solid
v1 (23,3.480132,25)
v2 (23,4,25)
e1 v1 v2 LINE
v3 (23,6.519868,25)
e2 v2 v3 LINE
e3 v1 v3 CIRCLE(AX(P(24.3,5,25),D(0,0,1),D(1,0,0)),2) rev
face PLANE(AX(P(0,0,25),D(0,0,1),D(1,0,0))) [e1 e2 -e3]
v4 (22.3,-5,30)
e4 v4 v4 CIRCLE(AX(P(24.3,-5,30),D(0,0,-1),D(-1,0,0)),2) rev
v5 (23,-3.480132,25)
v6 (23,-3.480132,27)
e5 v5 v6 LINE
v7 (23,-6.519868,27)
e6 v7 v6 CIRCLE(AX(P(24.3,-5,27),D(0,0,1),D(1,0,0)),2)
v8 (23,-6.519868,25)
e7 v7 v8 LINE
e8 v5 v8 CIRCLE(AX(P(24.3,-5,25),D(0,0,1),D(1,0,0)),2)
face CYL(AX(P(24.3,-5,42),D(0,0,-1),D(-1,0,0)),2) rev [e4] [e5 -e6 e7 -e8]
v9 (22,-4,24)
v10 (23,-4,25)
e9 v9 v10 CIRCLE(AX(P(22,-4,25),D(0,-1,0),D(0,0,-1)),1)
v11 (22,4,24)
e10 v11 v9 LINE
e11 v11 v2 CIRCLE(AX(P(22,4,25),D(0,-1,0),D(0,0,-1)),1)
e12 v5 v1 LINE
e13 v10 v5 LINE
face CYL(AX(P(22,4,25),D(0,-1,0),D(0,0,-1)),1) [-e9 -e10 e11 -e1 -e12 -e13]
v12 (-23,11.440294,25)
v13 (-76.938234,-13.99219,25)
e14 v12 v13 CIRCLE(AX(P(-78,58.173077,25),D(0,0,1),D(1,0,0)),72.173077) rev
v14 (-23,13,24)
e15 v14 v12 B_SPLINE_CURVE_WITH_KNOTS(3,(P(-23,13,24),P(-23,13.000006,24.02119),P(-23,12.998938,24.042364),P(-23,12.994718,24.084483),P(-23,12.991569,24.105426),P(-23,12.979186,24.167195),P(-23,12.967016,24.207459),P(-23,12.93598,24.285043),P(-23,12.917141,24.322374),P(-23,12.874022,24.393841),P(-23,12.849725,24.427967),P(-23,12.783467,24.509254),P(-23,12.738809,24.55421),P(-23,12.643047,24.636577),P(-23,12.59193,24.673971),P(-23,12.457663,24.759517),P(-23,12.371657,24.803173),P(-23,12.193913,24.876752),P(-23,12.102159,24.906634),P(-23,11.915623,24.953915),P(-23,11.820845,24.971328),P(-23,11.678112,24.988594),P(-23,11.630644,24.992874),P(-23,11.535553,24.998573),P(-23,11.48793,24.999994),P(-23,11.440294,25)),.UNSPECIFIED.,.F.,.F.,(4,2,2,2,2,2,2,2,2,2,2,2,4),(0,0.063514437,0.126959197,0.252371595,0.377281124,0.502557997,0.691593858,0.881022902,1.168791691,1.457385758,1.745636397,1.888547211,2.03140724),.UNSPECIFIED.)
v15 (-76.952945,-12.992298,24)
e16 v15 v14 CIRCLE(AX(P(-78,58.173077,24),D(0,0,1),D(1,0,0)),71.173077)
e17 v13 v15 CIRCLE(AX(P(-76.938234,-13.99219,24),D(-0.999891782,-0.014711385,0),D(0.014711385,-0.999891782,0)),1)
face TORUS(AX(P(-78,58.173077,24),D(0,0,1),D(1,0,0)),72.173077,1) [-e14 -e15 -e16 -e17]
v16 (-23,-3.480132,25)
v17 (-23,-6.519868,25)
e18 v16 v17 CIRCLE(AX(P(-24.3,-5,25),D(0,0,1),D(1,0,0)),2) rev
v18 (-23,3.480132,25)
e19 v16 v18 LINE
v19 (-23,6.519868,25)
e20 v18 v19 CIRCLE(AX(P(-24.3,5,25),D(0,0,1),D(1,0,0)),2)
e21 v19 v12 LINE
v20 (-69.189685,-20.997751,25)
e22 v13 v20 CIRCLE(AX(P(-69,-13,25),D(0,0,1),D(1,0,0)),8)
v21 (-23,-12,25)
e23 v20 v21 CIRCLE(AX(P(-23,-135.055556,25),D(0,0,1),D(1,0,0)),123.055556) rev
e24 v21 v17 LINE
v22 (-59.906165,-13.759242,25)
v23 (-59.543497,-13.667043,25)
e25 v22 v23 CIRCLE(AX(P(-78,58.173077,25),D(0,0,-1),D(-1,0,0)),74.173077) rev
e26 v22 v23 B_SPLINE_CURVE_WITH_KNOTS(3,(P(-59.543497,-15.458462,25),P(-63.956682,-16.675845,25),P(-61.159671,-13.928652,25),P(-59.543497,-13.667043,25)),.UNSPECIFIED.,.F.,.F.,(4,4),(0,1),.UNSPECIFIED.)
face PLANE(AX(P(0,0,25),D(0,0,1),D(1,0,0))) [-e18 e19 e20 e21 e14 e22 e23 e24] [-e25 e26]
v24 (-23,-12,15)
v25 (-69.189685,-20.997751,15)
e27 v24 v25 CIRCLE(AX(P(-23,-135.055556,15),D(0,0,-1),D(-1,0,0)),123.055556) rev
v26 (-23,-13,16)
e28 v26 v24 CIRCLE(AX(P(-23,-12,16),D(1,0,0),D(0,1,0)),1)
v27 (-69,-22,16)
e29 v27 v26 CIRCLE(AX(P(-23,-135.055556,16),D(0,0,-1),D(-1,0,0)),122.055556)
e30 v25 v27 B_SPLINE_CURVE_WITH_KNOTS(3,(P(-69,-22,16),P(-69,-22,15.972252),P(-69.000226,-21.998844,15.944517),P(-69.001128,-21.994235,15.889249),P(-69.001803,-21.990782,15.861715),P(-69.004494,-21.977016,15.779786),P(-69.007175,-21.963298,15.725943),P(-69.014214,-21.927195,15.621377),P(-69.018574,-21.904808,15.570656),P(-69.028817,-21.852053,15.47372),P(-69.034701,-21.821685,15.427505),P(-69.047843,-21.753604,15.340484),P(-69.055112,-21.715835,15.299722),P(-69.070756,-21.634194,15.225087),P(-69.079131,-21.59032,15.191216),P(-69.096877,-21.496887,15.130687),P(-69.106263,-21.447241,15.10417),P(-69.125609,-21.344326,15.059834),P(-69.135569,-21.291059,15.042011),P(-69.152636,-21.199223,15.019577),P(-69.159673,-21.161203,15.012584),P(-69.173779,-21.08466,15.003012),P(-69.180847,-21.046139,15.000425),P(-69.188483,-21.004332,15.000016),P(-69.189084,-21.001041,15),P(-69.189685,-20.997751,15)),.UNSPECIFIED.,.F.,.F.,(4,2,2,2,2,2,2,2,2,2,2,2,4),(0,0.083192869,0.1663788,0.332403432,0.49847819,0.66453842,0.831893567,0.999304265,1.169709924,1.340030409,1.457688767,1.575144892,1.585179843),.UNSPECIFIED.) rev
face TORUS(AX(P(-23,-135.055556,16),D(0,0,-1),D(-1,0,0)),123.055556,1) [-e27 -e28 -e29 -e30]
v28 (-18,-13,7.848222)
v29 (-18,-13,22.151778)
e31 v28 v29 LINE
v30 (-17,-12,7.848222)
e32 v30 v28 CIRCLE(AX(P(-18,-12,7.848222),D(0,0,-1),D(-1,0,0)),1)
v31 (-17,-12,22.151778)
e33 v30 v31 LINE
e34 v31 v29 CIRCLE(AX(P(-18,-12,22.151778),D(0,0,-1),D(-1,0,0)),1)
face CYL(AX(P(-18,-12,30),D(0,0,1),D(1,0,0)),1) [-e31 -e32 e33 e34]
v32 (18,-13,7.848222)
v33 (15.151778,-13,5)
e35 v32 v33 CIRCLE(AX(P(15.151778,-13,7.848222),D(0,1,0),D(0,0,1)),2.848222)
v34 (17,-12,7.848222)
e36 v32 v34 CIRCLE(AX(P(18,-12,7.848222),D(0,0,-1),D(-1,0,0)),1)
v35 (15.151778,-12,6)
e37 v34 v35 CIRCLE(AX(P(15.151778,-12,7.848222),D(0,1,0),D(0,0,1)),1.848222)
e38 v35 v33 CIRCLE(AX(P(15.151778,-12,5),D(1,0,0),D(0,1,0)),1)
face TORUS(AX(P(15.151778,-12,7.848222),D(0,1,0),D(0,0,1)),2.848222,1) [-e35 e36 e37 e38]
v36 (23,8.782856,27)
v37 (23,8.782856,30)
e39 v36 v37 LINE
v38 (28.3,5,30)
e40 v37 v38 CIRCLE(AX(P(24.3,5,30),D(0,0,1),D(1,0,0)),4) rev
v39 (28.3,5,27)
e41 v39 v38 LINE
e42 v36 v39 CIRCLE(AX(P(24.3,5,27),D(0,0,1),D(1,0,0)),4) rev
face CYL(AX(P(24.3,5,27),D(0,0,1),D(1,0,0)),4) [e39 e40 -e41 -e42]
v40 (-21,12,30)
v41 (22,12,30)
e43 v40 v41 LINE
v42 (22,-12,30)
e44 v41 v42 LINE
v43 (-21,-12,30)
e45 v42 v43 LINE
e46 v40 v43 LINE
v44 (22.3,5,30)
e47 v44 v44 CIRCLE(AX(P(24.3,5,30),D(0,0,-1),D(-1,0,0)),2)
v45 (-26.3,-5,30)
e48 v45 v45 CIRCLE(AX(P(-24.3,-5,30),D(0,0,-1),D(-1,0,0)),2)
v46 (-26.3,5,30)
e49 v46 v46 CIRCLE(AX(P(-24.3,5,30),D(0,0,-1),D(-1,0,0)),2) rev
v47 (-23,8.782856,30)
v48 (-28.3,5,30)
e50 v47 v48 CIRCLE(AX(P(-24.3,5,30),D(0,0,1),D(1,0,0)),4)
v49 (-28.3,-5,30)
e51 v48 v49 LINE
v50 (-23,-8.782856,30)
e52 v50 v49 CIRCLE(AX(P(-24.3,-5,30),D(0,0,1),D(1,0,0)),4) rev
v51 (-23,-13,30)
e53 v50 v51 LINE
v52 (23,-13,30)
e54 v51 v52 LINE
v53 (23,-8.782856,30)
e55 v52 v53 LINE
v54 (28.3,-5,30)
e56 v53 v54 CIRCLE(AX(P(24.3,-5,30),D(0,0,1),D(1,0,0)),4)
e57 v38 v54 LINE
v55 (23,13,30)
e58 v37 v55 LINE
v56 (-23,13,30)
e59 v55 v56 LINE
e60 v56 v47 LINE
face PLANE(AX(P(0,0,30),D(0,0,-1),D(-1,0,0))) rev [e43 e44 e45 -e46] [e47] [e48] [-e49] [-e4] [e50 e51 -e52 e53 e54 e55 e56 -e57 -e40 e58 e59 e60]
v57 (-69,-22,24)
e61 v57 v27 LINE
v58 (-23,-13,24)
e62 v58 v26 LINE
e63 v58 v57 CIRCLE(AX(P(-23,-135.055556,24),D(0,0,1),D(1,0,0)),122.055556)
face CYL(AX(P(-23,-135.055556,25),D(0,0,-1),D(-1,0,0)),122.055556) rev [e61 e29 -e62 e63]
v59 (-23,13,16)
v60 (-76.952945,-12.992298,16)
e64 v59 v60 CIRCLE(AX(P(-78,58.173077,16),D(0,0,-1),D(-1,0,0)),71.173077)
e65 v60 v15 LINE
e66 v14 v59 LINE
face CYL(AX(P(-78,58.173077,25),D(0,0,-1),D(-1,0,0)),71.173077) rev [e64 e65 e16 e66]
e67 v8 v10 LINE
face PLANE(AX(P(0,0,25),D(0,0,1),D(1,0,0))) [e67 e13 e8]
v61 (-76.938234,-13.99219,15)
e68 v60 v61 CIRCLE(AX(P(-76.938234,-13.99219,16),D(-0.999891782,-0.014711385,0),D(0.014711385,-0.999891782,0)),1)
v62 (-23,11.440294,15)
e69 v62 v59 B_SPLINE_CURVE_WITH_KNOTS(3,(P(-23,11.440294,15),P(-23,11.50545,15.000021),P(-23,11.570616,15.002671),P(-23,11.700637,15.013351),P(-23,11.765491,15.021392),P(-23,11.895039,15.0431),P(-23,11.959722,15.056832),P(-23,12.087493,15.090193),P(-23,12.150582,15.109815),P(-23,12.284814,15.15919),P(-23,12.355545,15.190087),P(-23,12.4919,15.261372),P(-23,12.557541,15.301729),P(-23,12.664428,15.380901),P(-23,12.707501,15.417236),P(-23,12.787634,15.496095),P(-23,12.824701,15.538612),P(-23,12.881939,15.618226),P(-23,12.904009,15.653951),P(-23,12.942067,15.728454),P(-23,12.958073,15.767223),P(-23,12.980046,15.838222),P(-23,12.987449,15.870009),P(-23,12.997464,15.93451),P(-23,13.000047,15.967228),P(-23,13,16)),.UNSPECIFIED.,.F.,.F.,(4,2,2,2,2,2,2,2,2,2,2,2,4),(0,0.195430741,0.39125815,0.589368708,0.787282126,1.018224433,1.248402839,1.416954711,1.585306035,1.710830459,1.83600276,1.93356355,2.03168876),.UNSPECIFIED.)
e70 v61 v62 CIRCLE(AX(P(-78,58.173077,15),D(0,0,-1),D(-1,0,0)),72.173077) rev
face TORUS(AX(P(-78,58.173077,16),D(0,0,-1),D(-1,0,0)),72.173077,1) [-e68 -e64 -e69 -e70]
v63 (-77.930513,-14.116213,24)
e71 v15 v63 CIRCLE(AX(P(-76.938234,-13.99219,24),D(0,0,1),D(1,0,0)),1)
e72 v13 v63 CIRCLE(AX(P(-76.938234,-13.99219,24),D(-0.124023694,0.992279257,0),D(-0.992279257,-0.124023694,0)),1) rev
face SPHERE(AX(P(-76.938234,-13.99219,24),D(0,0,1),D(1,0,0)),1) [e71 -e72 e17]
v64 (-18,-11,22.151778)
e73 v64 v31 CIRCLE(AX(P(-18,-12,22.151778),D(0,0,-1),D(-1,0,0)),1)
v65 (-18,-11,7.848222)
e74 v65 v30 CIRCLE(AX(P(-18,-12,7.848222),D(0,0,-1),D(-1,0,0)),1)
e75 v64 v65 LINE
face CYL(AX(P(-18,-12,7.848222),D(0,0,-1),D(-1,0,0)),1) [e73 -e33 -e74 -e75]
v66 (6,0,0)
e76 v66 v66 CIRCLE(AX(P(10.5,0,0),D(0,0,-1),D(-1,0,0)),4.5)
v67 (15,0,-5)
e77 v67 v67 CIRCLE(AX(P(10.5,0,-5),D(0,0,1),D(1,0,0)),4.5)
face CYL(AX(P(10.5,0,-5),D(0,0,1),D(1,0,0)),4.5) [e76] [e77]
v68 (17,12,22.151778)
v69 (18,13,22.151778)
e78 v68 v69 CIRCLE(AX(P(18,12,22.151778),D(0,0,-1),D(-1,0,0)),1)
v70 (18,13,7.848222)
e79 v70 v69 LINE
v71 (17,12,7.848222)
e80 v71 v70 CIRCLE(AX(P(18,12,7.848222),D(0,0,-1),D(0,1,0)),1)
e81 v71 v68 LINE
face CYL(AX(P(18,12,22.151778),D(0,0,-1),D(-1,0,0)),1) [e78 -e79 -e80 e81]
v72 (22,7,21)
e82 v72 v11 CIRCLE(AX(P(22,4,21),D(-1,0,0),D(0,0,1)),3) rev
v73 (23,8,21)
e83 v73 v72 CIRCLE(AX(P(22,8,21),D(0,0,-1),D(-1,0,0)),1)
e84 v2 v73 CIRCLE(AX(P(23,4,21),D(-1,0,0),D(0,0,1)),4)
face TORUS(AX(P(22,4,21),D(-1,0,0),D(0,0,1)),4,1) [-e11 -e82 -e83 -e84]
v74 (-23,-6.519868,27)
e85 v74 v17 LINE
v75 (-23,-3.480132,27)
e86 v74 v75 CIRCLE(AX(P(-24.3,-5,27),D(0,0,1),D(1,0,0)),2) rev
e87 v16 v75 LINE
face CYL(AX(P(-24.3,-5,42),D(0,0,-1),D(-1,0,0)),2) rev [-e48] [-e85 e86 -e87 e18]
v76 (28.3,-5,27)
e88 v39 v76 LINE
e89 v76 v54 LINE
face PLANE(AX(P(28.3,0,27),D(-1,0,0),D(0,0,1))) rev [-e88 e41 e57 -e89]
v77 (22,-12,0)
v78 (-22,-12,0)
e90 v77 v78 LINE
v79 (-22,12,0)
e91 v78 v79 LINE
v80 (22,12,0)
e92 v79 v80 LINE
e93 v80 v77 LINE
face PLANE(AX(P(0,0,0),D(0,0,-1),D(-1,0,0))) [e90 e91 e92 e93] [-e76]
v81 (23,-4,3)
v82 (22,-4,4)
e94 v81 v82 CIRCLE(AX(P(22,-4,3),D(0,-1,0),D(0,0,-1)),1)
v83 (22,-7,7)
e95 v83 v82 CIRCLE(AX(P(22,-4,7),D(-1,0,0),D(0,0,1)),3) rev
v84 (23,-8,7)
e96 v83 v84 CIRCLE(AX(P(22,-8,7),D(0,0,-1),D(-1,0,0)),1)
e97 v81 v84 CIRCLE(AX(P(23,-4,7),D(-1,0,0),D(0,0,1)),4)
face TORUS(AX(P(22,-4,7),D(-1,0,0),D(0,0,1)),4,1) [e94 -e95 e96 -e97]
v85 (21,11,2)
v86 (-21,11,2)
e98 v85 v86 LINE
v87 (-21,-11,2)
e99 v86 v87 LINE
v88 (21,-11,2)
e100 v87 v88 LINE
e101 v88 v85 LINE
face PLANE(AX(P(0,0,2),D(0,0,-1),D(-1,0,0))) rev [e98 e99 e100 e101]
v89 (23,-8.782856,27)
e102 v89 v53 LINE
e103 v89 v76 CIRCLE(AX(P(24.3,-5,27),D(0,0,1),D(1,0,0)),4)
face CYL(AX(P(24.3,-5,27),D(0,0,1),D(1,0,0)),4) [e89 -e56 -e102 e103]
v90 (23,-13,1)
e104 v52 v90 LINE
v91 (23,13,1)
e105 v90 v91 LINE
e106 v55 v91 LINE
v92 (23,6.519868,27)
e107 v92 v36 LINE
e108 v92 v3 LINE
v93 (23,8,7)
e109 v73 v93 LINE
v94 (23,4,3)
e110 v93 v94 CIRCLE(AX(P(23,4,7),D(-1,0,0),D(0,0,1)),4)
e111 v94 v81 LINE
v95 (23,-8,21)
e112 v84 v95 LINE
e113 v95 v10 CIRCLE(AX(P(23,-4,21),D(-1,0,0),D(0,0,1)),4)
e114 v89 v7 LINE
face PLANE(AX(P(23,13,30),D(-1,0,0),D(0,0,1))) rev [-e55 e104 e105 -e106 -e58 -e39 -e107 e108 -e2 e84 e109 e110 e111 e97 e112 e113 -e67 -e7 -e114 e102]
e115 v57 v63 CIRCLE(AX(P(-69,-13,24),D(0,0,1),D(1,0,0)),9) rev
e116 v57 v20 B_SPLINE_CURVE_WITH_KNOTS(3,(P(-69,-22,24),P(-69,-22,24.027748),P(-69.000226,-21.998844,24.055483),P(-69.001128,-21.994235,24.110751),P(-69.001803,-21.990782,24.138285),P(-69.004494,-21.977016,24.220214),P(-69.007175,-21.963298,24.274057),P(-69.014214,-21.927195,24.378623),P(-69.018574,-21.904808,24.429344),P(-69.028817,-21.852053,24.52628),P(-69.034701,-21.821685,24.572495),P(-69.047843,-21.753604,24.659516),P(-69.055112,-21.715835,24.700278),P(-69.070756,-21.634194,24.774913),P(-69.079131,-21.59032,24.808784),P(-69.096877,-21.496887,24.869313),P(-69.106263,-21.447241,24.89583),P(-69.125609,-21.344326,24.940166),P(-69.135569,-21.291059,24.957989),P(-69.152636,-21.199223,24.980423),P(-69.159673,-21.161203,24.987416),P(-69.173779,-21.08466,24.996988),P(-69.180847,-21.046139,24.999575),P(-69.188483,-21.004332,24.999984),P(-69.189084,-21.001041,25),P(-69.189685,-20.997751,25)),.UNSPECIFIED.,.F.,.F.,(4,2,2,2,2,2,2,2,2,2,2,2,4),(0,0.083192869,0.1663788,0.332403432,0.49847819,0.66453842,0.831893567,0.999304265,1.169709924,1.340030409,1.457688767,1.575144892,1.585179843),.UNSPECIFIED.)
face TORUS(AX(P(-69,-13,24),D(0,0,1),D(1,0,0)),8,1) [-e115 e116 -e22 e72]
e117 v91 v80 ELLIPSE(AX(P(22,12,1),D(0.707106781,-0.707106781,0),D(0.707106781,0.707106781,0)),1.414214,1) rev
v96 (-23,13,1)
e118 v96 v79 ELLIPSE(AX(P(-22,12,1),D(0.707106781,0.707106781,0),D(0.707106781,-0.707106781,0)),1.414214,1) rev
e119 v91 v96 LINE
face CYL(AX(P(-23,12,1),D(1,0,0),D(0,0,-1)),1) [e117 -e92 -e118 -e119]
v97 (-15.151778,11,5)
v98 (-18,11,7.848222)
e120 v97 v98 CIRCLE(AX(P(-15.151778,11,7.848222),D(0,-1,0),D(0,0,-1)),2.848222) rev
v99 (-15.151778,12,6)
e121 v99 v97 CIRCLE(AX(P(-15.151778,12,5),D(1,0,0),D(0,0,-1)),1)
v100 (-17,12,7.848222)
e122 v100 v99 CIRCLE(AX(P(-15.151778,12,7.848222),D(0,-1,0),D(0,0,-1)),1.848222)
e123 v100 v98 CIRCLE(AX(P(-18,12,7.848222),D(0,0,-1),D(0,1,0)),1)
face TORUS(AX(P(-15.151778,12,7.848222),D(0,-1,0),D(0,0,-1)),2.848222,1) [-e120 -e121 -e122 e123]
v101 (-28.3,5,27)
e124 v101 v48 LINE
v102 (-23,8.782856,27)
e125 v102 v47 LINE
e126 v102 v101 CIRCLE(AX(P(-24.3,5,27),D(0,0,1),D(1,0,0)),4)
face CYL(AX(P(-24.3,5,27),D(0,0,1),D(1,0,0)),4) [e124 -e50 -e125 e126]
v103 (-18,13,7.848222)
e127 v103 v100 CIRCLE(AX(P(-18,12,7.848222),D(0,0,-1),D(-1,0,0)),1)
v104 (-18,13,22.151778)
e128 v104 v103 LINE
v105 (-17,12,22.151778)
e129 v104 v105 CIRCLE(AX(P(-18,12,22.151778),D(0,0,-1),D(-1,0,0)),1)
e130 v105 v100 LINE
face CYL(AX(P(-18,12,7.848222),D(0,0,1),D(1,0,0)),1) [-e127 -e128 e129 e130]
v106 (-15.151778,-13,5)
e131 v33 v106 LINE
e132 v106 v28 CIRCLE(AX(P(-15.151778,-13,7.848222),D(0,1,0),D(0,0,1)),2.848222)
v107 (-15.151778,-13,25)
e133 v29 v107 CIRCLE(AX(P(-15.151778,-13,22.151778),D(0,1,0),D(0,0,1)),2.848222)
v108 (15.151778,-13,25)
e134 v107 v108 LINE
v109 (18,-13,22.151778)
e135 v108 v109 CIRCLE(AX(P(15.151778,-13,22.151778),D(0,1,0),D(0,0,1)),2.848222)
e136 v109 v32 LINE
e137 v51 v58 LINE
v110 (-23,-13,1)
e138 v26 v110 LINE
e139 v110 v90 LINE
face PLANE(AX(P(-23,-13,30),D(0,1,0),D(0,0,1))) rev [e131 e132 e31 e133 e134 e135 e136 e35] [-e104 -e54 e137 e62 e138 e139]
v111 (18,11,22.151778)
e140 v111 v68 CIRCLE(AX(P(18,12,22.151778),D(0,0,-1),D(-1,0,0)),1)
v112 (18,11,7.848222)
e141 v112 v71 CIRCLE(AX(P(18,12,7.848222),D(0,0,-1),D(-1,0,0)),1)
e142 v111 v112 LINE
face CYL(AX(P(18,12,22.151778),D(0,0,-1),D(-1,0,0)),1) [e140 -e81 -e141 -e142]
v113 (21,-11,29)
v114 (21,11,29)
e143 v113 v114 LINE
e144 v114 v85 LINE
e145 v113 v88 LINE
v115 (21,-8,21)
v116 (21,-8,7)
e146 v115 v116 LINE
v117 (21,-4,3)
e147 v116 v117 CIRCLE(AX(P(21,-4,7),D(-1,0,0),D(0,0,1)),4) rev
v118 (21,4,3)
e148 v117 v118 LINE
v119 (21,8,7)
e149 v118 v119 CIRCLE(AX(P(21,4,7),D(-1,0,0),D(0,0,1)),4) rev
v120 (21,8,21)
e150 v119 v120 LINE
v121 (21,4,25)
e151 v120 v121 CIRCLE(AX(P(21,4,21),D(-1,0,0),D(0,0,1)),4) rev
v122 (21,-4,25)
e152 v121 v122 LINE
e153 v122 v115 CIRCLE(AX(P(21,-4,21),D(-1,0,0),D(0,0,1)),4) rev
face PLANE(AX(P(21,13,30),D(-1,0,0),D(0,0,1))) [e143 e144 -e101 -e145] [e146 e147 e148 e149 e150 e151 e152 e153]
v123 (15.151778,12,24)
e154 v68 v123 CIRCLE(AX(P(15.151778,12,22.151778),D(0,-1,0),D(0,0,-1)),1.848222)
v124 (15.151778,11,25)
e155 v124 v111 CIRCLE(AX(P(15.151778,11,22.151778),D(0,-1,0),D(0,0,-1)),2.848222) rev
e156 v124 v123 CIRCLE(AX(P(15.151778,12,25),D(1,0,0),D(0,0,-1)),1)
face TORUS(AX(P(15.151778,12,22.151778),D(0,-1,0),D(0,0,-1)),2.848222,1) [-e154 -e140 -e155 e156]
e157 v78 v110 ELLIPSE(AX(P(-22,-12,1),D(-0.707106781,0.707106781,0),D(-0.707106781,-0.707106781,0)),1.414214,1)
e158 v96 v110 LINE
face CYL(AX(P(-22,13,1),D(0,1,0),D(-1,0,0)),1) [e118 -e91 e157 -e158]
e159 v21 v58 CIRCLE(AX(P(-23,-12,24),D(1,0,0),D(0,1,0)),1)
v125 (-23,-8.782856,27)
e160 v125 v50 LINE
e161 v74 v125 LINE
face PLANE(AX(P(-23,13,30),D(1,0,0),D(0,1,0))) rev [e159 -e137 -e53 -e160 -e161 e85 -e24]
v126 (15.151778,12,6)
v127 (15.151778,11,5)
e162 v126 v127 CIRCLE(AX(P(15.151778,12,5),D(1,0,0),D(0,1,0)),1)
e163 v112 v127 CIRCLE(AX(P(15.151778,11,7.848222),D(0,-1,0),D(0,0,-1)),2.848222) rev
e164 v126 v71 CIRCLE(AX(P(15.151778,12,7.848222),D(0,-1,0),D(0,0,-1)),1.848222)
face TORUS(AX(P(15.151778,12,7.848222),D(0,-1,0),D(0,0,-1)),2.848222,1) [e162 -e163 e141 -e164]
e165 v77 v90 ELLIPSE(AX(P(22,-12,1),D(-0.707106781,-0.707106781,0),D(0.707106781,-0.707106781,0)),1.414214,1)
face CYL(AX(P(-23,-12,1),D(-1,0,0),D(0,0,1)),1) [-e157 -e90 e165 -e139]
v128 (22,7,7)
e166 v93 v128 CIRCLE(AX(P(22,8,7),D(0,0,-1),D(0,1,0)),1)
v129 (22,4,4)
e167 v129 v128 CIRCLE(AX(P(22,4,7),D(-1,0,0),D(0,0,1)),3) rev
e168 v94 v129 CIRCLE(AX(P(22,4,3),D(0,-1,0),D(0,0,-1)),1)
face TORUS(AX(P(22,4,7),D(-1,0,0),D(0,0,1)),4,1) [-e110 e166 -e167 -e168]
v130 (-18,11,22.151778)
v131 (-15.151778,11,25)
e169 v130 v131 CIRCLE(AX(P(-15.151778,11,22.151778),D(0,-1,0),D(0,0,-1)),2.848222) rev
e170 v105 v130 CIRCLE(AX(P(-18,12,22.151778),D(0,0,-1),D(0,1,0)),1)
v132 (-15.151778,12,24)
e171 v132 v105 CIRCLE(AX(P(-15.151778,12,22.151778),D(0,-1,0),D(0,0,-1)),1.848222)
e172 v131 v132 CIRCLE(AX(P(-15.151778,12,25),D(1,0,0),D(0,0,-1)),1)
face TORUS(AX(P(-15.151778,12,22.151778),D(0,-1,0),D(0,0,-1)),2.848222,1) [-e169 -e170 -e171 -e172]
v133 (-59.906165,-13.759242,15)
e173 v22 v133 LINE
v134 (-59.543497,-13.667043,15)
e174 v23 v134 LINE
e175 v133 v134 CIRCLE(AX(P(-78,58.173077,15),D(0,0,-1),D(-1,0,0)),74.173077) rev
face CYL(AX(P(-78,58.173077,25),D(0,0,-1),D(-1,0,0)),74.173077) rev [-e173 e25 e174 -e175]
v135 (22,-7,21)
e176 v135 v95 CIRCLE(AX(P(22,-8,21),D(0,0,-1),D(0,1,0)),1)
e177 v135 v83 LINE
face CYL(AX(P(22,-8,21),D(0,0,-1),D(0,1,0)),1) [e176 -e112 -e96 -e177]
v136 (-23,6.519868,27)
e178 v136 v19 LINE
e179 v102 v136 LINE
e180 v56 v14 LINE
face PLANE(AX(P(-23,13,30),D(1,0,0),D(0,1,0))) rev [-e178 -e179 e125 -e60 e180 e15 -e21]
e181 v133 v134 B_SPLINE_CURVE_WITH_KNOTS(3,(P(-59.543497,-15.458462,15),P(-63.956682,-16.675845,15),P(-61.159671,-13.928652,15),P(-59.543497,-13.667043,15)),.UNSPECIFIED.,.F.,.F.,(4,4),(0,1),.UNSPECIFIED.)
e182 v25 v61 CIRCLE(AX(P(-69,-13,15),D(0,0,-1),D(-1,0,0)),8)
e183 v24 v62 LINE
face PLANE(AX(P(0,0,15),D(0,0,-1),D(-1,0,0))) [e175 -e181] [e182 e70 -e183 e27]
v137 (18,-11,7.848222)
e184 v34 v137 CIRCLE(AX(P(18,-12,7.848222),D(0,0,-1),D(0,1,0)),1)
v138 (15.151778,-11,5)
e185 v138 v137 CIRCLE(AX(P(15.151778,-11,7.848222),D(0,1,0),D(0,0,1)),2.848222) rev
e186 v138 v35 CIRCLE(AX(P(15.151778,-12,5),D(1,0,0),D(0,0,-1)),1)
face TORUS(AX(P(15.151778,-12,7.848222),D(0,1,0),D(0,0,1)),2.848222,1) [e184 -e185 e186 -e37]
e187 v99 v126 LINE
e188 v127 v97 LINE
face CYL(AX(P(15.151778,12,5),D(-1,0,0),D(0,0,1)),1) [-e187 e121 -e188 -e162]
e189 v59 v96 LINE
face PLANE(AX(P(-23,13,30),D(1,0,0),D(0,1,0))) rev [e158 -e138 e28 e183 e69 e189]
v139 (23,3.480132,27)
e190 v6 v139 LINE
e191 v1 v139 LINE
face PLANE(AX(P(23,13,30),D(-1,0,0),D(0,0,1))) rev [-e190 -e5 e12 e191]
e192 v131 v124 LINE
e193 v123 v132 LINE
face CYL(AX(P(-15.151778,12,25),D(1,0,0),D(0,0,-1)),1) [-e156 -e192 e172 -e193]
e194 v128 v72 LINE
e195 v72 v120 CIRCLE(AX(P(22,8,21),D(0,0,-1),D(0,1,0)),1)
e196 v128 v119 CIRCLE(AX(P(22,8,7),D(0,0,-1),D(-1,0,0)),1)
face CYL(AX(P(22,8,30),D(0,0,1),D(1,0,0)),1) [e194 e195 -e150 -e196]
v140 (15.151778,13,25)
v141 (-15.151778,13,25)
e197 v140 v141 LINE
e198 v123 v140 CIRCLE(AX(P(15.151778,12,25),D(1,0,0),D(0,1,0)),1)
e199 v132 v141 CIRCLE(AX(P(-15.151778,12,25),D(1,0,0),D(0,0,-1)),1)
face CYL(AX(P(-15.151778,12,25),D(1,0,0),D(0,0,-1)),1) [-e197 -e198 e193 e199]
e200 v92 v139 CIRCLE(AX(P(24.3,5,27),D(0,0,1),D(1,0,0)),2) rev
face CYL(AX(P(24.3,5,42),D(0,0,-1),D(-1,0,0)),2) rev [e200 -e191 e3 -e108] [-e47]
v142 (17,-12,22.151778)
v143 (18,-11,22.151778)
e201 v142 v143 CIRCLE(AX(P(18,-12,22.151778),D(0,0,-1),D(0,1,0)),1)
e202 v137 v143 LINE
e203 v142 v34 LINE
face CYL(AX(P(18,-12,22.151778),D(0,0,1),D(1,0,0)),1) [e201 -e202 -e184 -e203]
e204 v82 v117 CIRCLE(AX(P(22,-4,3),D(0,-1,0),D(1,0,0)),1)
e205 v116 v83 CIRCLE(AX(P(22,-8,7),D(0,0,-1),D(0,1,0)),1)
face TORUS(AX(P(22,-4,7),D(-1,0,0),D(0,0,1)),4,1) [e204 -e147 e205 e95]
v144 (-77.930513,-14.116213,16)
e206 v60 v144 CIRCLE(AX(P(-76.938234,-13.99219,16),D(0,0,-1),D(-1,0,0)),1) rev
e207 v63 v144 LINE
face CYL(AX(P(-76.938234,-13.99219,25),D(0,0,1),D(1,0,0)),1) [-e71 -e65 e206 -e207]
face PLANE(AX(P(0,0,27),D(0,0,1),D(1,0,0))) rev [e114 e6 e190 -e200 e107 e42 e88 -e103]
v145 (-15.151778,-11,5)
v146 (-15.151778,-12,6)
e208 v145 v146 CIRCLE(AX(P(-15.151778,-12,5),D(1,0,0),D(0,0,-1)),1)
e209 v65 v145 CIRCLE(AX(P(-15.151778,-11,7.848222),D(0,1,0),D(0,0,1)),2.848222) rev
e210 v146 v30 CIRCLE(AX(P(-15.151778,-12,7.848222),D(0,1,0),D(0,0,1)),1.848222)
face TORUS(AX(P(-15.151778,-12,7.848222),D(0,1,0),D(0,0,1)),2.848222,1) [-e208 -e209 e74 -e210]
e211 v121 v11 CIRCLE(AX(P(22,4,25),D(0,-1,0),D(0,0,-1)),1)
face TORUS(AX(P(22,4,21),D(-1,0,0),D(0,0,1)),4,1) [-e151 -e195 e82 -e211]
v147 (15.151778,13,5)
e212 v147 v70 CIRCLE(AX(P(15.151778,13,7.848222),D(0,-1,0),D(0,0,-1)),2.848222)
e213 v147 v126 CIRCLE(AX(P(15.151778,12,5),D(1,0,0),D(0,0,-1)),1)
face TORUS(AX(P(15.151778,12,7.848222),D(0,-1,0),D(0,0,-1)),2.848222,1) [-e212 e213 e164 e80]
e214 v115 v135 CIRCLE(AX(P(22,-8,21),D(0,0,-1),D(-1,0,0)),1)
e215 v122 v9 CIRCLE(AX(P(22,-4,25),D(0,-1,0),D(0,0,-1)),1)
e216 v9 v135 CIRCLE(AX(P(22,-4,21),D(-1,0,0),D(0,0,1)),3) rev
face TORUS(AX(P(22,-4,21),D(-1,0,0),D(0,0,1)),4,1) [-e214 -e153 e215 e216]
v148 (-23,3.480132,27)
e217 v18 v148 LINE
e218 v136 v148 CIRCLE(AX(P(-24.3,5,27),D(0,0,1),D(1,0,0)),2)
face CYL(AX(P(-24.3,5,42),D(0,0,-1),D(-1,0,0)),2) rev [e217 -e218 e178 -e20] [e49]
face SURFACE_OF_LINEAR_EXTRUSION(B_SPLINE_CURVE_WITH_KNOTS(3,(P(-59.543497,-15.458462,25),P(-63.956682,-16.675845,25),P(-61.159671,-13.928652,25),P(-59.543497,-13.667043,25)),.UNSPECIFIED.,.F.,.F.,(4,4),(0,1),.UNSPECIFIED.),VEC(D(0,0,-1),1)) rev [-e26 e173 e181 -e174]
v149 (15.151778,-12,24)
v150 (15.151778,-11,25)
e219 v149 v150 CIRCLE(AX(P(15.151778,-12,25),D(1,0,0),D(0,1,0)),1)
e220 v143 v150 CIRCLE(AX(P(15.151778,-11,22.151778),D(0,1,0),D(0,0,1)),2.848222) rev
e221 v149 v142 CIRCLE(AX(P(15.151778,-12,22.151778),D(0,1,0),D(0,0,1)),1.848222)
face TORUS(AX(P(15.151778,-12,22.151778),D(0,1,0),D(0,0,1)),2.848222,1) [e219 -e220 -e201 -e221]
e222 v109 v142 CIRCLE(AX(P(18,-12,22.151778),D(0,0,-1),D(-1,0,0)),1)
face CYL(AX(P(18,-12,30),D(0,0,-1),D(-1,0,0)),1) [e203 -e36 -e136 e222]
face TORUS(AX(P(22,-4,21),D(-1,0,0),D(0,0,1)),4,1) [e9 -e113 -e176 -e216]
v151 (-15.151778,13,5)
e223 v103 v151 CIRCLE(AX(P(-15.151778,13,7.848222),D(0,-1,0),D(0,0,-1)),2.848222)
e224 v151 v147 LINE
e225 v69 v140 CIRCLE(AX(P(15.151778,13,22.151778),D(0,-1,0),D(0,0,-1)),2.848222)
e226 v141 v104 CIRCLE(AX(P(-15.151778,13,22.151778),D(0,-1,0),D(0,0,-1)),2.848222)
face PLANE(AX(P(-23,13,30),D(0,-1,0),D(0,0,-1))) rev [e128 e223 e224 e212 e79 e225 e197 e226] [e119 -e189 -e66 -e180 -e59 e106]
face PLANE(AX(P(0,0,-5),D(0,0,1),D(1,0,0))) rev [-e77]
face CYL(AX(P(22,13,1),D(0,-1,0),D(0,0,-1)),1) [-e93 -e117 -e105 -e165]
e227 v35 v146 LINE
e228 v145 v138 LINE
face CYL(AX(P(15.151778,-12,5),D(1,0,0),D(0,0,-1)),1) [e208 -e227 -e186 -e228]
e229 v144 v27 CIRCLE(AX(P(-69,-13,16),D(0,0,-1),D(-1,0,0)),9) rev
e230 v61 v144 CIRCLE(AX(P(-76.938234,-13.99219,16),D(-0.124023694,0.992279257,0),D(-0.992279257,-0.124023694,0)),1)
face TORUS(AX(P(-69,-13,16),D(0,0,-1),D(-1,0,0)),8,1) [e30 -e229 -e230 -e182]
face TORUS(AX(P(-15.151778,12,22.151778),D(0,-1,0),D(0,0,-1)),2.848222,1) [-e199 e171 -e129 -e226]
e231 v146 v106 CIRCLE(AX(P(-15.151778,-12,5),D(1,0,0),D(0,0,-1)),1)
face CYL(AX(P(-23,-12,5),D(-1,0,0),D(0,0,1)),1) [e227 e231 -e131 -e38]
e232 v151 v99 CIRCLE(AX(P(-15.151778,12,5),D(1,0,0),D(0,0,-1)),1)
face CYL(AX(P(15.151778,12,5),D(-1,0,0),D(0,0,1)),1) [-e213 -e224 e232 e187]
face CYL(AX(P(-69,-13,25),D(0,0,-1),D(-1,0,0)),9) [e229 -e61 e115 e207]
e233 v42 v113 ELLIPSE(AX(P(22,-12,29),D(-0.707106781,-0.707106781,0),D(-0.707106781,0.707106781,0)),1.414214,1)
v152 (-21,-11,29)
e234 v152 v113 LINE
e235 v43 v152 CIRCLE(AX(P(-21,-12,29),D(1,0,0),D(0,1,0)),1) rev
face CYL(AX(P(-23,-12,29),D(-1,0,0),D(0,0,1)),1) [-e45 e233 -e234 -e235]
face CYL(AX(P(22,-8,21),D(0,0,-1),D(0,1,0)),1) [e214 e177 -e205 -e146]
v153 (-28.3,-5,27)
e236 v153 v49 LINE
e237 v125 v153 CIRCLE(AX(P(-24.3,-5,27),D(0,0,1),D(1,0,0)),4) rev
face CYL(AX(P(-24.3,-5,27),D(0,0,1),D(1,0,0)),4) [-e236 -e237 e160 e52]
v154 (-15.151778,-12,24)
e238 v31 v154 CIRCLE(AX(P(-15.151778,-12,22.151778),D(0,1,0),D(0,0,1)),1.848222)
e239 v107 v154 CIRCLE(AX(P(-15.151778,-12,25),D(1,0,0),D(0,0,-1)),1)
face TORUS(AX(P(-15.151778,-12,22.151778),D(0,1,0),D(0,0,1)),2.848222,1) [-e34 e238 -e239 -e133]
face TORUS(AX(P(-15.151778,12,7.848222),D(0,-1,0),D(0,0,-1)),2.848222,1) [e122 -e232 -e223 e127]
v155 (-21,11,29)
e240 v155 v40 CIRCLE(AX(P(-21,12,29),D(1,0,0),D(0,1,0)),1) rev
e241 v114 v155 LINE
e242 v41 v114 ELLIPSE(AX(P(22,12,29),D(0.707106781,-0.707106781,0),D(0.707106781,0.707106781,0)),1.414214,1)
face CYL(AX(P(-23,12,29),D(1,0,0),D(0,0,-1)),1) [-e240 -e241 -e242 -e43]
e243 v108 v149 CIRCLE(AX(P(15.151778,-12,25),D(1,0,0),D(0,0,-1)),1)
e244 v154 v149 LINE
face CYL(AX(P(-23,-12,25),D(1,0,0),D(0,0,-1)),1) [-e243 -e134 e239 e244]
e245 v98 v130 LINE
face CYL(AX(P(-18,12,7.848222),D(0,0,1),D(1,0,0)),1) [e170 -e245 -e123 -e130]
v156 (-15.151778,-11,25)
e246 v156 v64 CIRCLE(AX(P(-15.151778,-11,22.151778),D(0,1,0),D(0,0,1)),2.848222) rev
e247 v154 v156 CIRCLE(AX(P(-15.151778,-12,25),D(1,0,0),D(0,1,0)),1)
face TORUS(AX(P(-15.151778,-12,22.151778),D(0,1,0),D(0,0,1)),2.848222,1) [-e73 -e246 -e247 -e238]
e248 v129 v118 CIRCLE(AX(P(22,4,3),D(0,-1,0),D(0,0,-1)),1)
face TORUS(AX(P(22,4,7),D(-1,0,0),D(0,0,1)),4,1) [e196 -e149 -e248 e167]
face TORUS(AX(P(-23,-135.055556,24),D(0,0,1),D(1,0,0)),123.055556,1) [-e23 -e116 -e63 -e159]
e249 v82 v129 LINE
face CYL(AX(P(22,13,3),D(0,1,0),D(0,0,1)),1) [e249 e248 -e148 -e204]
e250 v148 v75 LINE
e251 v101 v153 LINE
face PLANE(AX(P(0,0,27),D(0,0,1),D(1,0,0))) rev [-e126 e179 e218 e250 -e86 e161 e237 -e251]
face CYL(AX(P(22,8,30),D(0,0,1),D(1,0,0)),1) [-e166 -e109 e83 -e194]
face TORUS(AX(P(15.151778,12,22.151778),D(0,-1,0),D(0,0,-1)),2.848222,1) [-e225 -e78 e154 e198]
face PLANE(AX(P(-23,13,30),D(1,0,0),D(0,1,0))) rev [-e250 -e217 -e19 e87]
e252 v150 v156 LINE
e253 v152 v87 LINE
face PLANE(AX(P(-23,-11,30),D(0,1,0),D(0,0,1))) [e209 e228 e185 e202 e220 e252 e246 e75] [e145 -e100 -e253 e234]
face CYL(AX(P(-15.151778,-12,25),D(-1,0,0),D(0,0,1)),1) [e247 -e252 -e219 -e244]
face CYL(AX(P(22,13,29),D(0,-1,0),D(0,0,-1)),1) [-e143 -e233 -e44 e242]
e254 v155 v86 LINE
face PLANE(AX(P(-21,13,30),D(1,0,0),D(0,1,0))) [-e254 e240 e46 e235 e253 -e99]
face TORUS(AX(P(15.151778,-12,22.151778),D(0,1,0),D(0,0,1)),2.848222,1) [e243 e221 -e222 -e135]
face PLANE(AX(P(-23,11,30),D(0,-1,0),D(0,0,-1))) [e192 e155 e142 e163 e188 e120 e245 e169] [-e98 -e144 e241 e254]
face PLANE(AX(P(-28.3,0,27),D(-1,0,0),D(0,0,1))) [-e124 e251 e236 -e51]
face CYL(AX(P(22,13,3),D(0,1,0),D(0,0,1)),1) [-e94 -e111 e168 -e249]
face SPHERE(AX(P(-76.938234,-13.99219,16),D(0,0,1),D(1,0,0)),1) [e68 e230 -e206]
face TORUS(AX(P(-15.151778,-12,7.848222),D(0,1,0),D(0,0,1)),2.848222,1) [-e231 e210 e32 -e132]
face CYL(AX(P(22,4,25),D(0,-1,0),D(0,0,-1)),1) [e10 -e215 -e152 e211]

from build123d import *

# Parameters (mm, degrees)
SKETCH1_W               = 46
SKETCH1_H               = 26
BOSS_EXTRUDE3_DEPTH     = 30
SHELL1_T                = -2
CUT_EXTRUDE2_START      = 25
SKETCH4_R               = 2
CUT_EXTRUDE2_DEPTH      = 17
BOSS_EXTRUDE4_START     = -3
BOSS_EXTRUDE4_DEPTH     = 3
BOSS_EXTRUDE16_DEPTH    = 5
BOSS_EXTRUDE18_START    = -15
BOSS_EXTRUDE18_DEPTH    = 10
CUT_EXTRUDE5_DEPTH      = 91.603532065
CUT_EXTRUDE5_DEPTH_BACK = 91.603532065
FILLET50_R              = 1
CUT_EXTRUDE6_DEPTH      = 10
FILLET51_R              = 1


with BuildPart() as part:
    # Sketch1 → Boss-Extrude3 (new body)
    with BuildSketch(Plane.XY):
        Rectangle(SKETCH1_W, SKETCH1_H)
    extrude(amount=BOSS_EXTRUDE3_DEPTH)

    # Shell1
    shell1_openings = [part.faces().sort_by_distance(p)[0] for p in [
        (0, 0, 30),
    ]]
    offset(amount=SHELL1_T, openings=shell1_openings, kind=Kind.INTERSECTION)

    # Sketch4 → Cut-Extrude2 (cut)
    with BuildSketch(Plane.XY.offset(CUT_EXTRUDE2_START)):
        with Locations((24.3, 5)):
            Circle(SKETCH4_R)
        with Locations((24.3, -5)):
            Circle(SKETCH4_R)
        with Locations((-24.3, 5)):
            Circle(SKETCH4_R)
        with Locations((-24.3, -5)):
            Circle(SKETCH4_R)
    extrude(amount=CUT_EXTRUDE2_DEPTH, mode=Mode.SUBTRACT)

    # Sketch2 → Boss-Extrude4 (add)
    with BuildSketch(Plane.XY.offset(30).offset(BOSS_EXTRUDE4_START)):
        with BuildLine():
            ThreePointArc((-23, 8.782856064), (-26.623790008, 8.255764119), (-28.3, 5))
            Line((-28.3, 5), (-28.3, -5))
            ThreePointArc((-28.3, -5), (-26.623790008, -8.255764119), (-23, -8.782856064))
            Line((-23, -8.782856064), (-23, -6.519868415))
            ThreePointArc((-23, -6.519868415), (-26.3, -5), (-23, -3.480131585))
            Line((-23, -3.480131585), (-23, 3.480131585))
            ThreePointArc((-23, 3.480131585), (-26.3, 5), (-23, 6.519868415))
            Line((-23, 6.519868415), (-23, 8.782856064))
        make_face()
        with BuildLine():
            ThreePointArc((28.3, 5), (26.623790008, 8.255764119), (23, 8.782856064))
            Line((23, 8.782856064), (23, 6.519868415))
            ThreePointArc((23, 6.519868415), (26.3, 5), (23, 3.480131585))
            Line((23, 3.480131585), (23, -3.480131585))
            ThreePointArc((23, -3.480131585), (26.3, -5), (23, -6.519868415))
            Line((23, -6.519868415), (23, -8.782856064))
            ThreePointArc((23, -8.782856064), (26.623790008, -8.255764119), (28.3, -5))
            Line((28.3, -5), (28.3, 5))
        make_face()
    extrude(amount=BOSS_EXTRUDE4_DEPTH)

    # Sketch9 → Boss-Extrude16 (add)
    with BuildSketch(Plane.XY):
        with BuildLine():
            ThreePointArc((15, 0), (13.681980515, 3.181980515), (10.5, 4.5))
            Line((10.5, 4.5), (10.5, -4.5))
            ThreePointArc((10.5, -4.5), (13.681980515, -3.181980515), (15, 0))
        make_face()
        with BuildLine():
            Line((10.5, -4.5), (10.5, 4.5))
            ThreePointArc((10.5, 4.5), (6, 0), (10.5, -4.5))
        make_face()
    extrude(amount=-BOSS_EXTRUDE16_DEPTH)

    # Sketch14 → Boss-Extrude18 (add)
    with BuildSketch(Plane(origin=(0, 0, 0), x_dir=(-1, 0, 0), z_dir=(0, 0, -1)).offset(BOSS_EXTRUDE18_START)):
        with BuildLine():
            Line((23, 13), (23, -13))
            ThreePointArc((23, -13), (46.436083291, -15.271129848), (69, -22))
            ThreePointArc((69, -22), (75.363961031, -19.363961031), (78, -13))
            ThreePointArc((78, -13), (47.582077651, -6.172528045), (23, 13))
        make_face()
        with BuildLine():
            add(Edge.make_bspline(
                [(59.906165351, -13.759241877), (59.781268702, -13.717320791), (59.659348974, -13.685795892), (59.543496906, -13.667043022)],
                knots=[0.928317086, 0.928317086, 0.928317086, 0.928317086, 1, 1, 1, 1], degree=3))
            ThreePointArc((59.906165351, -13.759241877), (59.724772985, -13.713371159), (59.543496906, -13.667043022))
        make_face(mode=Mode.SUBTRACT)
    extrude(amount=-BOSS_EXTRUDE18_DEPTH)

    # Sketch6 → Cut-Extrude5 (cut, two sides: drawn at the far end of the back side and taken through both)
    with BuildSketch(Plane(origin=(0, 13, 0), x_dir=(1, 0, 0), z_dir=(0, 1, 0)).offset(-CUT_EXTRUDE5_DEPTH_BACK)):
        with BuildLine():
            Line((15.151778421, -6), (-15.151778421, -6))
            ThreePointArc((-15.151778421, -6), (-16.458668433, -6.541331567), (-17, -7.848221579))
            Line((-17, -7.848221579), (-17, -22.151778421))
            ThreePointArc((-17, -22.151778421), (-16.458668433, -23.458668433), (-15.151778421, -24))
            Line((-15.151778421, -24), (15.151778421, -24))
            ThreePointArc((15.151778421, -24), (16.458668433, -23.458668433), (17, -22.151778421))
            Line((17, -22.151778421), (17, -7.848221579))
            ThreePointArc((17, -7.848221579), (16.458668433, -6.541331567), (15.151778421, -6))
        make_face()
    extrude(amount=CUT_EXTRUDE5_DEPTH + CUT_EXTRUDE5_DEPTH_BACK, mode=Mode.SUBTRACT)

    # Fillet50
    fillet50_edges = [part.edges().sort_by_distance(p)[0] for p in [
        (16.458668433, 13, 6.541331567),
        (17, 13, 15),
        (16.458668433, 13, 23.458668433),
        (0, 13, 24),
        (-16.458668433, 13, 23.458668433),
        (-17, 13, 15),
        (-16.458668433, 13, 6.541331567),
        (-16.458668433, 11, 6.541331567),
        (-17, 11, 15),
        (-16.458668433, 11, 23.458668433),
        (0, 11, 24),
        (16.458668433, 11, 23.458668433),
        (17, 11, 15),
        (16.458668433, 11, 6.541331567),
        (16.458668433, -13, 6.541331567),
        (17, -13, 15),
        (16.458668433, -13, 23.458668433),
        (0, -13, 24),
        (-16.458668433, -13, 23.458668433),
        (-17, -13, 15),
        (-16.458668433, -13, 6.541331567),
        (16.458668433, -11, 6.541331567),
        (17, -11, 15),
        (16.458668433, -11, 23.458668433),
        (0, -11, 24),
        (-16.458668433, -11, 23.458668433),
        (-17, -11, 15),
        (-16.458668433, -11, 6.541331567),
        (-23, 0, 0),
        (0, -13, 0),
        (23, 0, 0),
        (0, 13, 0),
        (0, 13, 6),
        (0, 11, 6),
        (0, -13, 6),
        (0, -11, 6),
        (-75.363961031, -19.363961031, 15),
        (-75.363961031, -19.363961031, 25),
        (-46.436083291, -15.271129848, 15),
        (-46.436083291, -15.271129848, 25),
        (-78, -13, 20),
        (-47.582077651, -6.172528045, 15),
        (-47.582077651, -6.172528045, 25),
        (0, -11, 30),
        (0, 11, 30),
        (21, 0, 30),
    ]]
    fillet(fillet50_edges, radius=FILLET50_R - 0.0001)  # a hair under: the kernel refuses the full size

    # Sketch17 → Cut-Extrude6 (cut)
    with BuildSketch(Plane(origin=(23, 0, 0), x_dir=(0, 0, -1), z_dir=(1, 0, 0))):
        with BuildLine():
            Line((-24, 4), (-24, -4))
            ThreePointArc((-24, -4), (-23.121320344, -6.121320344), (-21, -7))
            Line((-21, -7), (-10, -7))
            ThreePointArc((-10, -7), (-7.878679656, -6.121320344), (-7, -4))
            Line((-7, -4), (-7, 4))
            ThreePointArc((-7, 4), (-7.878679656, 6.121320344), (-10, 7))
            Line((-10, 7), (-21, 7))
            ThreePointArc((-21, 7), (-23.121320344, 6.121320344), (-24, 4))
        make_face()
        with BuildLine():
            Line((-21, 4), (-21, -4))
            ThreePointArc((-21, -4), (-20.121320344, -6.121320344), (-18, -7))
            Line((-18, -7), (-7, -7))
            ThreePointArc((-7, -7), (-4.878679656, -6.121320344), (-4, -4))
            Line((-4, -4), (-4, 4))
            ThreePointArc((-4, 4), (-4.878679656, 6.121320344), (-7, 7))
            Line((-7, 7), (-18, 7))
            ThreePointArc((-18, 7), (-20.121320344, 6.121320344), (-21, 4))
        make_face()
    extrude(amount=-CUT_EXTRUDE6_DEPTH, mode=Mode.SUBTRACT)

    # Fillet51
    fillet51_edges = [part.edges().sort_by_distance(p)[0] for p in [
        (21, -6.121320344, 4.878679656),
        (21, -7, 14),
        (21, -6.121320344, 23.121320344),
        (21, 0, 24),
        (21, 6.121320344, 23.121320344),
        (21, 7, 14),
        (21, 6.121320344, 4.878679656),
        (23, 6.121320344, 4.878679656),
        (23, 7, 14),
        (23, 6.121320344, 23.121320344),
        (23, 0, 24),
        (23, -6.121320344, 23.121320344),
        (23, -7, 14),
        (23, -6.121320344, 4.878679656),
        (21, 0, 4),
        (23, 0, 4),
    ]]
    fillet(fillet51_edges, radius=FILLET51_R - 0.0001)  # a hair under: the kernel refuses the full size


solid = part.part
